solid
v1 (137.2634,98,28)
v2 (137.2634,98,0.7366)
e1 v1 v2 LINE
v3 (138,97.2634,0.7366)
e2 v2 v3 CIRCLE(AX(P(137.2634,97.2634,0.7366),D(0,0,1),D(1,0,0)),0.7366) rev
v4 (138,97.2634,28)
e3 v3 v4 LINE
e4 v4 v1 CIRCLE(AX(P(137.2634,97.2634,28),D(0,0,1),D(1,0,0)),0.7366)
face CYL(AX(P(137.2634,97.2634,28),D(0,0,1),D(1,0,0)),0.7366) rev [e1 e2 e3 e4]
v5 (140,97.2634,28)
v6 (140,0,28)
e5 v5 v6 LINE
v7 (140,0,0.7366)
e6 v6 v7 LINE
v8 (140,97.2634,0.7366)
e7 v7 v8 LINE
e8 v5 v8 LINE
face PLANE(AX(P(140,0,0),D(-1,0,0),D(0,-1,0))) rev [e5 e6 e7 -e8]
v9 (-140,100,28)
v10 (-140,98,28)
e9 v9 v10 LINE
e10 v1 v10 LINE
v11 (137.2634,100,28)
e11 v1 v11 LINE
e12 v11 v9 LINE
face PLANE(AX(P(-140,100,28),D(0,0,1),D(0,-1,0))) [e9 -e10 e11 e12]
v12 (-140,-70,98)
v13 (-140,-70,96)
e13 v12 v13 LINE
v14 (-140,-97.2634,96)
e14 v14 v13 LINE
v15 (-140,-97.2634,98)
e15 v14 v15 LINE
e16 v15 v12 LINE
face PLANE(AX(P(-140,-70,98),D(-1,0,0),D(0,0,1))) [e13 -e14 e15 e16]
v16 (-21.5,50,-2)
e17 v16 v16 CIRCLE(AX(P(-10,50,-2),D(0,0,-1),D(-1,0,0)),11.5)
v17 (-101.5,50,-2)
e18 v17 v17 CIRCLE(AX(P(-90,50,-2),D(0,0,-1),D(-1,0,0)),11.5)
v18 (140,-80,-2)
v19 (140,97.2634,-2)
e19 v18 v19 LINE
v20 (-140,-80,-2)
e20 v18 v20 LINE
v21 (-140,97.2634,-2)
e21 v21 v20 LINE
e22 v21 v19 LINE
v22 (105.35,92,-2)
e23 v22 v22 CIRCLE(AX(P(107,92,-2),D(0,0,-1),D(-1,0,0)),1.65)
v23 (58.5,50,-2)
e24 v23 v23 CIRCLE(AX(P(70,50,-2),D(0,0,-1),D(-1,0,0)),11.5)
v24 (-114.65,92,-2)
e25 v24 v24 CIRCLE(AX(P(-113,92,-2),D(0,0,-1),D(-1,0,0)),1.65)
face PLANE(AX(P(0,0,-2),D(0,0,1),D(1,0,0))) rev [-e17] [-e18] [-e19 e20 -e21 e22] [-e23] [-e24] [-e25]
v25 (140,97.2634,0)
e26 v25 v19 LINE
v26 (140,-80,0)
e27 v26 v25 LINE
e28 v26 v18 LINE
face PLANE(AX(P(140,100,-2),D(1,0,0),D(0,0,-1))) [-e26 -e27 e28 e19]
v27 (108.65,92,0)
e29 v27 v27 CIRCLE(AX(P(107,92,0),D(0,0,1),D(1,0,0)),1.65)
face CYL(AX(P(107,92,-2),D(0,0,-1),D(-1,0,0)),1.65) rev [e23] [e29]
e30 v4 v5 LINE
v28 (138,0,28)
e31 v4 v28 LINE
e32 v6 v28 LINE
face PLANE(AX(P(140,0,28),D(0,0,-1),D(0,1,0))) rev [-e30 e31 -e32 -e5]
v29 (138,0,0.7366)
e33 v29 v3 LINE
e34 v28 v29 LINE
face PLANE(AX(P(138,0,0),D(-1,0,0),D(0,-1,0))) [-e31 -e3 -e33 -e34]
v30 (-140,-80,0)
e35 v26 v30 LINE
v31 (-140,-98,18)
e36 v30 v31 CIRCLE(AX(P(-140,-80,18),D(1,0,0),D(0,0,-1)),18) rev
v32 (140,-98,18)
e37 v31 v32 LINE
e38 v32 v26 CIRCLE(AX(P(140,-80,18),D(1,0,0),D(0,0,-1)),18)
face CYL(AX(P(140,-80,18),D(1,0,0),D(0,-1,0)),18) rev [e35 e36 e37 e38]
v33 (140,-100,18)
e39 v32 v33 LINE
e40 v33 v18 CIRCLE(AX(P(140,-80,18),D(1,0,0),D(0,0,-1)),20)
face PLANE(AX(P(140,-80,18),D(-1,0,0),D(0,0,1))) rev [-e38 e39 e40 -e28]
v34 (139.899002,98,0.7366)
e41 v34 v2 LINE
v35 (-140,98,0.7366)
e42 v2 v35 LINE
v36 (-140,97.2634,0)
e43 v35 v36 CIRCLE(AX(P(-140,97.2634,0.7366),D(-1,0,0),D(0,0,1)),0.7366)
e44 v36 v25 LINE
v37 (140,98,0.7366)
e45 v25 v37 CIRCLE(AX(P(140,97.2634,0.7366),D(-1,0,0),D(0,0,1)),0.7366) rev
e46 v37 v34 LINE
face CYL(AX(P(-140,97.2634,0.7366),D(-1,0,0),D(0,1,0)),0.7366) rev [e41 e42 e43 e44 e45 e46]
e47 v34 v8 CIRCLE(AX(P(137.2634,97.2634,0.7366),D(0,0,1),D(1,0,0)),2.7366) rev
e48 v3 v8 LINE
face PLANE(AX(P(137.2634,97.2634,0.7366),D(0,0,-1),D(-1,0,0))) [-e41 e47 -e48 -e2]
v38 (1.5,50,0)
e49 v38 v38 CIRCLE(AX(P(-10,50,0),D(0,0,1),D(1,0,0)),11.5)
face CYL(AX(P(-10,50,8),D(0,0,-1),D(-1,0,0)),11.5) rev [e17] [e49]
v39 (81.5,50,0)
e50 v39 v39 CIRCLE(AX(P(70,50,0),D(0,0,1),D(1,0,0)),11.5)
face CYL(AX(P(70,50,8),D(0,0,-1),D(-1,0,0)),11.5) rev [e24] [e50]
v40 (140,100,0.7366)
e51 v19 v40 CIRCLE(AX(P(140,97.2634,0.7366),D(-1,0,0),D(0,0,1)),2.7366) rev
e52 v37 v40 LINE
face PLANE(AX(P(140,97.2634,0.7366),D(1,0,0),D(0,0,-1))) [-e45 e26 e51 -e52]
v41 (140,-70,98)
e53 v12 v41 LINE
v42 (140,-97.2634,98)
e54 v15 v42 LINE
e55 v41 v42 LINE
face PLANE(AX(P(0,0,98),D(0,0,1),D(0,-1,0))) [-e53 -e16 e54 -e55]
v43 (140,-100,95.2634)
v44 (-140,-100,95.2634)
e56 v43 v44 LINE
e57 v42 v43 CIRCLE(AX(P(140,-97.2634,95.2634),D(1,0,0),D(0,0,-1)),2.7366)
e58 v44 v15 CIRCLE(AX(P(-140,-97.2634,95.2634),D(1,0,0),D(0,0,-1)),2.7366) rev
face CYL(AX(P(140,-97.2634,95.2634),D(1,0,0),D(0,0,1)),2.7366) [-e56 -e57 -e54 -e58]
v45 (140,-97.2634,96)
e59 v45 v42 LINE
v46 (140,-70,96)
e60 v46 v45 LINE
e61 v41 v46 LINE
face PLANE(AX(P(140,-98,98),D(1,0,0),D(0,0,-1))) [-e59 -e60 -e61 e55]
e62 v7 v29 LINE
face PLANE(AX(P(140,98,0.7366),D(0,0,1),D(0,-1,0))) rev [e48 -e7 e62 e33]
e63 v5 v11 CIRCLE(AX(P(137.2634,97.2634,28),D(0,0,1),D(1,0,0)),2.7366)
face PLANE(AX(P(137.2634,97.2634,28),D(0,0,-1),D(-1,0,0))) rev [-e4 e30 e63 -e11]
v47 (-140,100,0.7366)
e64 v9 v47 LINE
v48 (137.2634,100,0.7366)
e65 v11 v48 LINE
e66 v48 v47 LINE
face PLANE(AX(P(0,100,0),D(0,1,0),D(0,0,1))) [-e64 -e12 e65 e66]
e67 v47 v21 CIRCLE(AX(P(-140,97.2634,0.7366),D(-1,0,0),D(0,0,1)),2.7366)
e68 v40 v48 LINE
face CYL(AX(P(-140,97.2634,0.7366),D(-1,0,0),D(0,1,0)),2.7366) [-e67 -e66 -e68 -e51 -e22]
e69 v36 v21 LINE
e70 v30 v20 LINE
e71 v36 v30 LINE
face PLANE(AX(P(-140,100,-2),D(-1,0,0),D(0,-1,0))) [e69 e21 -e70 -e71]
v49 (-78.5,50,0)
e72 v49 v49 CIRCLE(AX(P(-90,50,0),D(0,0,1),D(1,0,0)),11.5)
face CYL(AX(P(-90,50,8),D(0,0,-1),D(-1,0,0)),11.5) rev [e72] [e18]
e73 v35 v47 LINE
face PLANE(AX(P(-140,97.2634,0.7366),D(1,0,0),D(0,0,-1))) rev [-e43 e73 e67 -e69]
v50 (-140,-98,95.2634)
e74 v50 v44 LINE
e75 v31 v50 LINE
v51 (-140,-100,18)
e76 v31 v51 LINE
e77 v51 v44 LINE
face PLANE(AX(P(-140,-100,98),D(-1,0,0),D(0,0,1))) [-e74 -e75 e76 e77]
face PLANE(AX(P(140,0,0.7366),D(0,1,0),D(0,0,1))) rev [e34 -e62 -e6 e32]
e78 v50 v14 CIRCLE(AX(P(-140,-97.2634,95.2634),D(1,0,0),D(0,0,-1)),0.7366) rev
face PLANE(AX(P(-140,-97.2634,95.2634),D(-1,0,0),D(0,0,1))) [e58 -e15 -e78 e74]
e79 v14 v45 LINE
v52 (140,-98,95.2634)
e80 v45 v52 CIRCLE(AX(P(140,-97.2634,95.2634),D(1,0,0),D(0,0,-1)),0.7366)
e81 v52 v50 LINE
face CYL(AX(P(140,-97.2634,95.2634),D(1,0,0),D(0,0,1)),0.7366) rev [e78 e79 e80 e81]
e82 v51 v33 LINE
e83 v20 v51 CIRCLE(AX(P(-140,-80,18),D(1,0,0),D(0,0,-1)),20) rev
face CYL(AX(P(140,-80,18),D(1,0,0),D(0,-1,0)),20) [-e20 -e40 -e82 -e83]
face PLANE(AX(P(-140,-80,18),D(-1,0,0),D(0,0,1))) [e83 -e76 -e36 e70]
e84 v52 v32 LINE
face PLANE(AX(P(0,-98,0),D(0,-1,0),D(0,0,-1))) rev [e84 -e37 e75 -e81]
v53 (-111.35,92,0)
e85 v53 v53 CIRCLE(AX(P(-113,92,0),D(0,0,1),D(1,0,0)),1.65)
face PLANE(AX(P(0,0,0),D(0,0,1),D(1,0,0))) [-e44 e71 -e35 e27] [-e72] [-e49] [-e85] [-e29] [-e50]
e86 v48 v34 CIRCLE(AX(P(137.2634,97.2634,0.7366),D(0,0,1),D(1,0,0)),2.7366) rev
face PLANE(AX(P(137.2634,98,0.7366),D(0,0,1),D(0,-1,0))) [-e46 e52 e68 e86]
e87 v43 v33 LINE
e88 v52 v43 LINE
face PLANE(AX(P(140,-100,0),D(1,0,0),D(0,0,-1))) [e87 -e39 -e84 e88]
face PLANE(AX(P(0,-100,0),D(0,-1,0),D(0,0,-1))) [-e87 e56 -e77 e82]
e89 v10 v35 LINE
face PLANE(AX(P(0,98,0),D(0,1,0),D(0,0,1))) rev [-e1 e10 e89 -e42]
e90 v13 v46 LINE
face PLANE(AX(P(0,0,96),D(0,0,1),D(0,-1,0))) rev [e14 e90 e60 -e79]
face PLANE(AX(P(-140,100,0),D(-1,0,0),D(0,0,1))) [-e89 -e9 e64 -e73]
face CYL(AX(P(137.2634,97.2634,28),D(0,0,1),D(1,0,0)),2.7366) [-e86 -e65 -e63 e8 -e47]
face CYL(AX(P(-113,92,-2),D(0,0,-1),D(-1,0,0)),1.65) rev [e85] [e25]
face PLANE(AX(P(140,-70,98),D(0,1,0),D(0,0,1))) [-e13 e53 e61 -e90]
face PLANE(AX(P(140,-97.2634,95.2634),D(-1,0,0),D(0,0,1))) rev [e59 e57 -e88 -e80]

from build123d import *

# Parameters (mm, degrees)
SKETCH_2_W                       = 280
SKETCH_2_H                       = 200
SM_BASE_FLANGE_1_DEPTH           = 2
SM_EDGE_FLANGE_1_STRIP_W         = 44
SM_EDGE_FLANGE_1_STRIP_H         = 2
SM_EDGE_FLANGE_1_STRIP_CUT_DEPTH = 280
SM_EDGE_FLANGE_1_DEPTH           = 280
SM_EDGE_FLANGE_2_STRIP_W         = 9.4732
SM_EDGE_FLANGE_2_STRIP_H         = 2
SM_EDGE_FLANGE_2_STRIP_CUT_DEPTH = 280
SM_EDGE_FLANGE_2_DEPTH           = 280
SM_EDGE_FLANGE_3_STRIP_W         = 9.4732
SM_EDGE_FLANGE_3_STRIP_H         = 2
SM_EDGE_FLANGE_3_STRIP_CUT_DEPTH = 280
SM_EDGE_FLANGE_3_DEPTH           = 280
SKETCH_36_R                      = 11.5
CUT_EXTRUDE_3_DEPTH              = 10
SM_EDGE_FLANGE_4_STRIP_W         = 9.4732
SM_EDGE_FLANGE_4_STRIP_H         = 2
SM_EDGE_FLANGE_4_STRIP_CUT_DEPTH = 27.2634
SM_EDGE_FLANGE_4_DEPTH           = 27.2634
HOLE_WIZARD_M4_1_D               = 3.3


# Sheet-metal steps are written as plain solids
with BuildPart() as part:
    # Sketch 2 → 基体-法兰1 (new body)
    with BuildSketch(Plane.XY):
        Rectangle(SKETCH_2_W, SKETCH_2_H)
    extrude(amount=-SM_BASE_FLANGE_1_DEPTH)

    # 边线-法兰1 strip (across the edge) → 边线-法兰1 strip cut (cut)
    with BuildSketch(Plane(origin=(-140, -100, 0), x_dir=(0, 1, 0), z_dir=(1, 0, 0))):
        with Locations((-2, -1)):
            Rectangle(SM_EDGE_FLANGE_1_STRIP_W, SM_EDGE_FLANGE_1_STRIP_H)
    extrude(amount=SM_EDGE_FLANGE_1_STRIP_CUT_DEPTH, mode=Mode.SUBTRACT)

    # 边线-法兰1 section (across the edge) → 边线-法兰1 (add)
    with BuildSketch(Plane(origin=(-140, -100, 0), x_dir=(0, 1, 0), z_dir=(1, 0, 0))):
        with BuildLine():
            Line((0, 18), (0, 98))
            Line((0, 98), (2, 98))
            Line((2, 98), (2, 18))
            ThreePointArc((2, 18), (7.272077939, 5.272077939), (20, 0))
            Line((20, 0), (20, -2))
            ThreePointArc((20, -2), (5.857864376, 3.857864376), (0, 18))
        make_face()
    extrude(amount=SM_EDGE_FLANGE_1_DEPTH)

    # 边线-法兰2 strip (across the edge) → 边线-法兰2 strip cut (cut)
    with BuildSketch(Plane(origin=(140, 100, 0), x_dir=(0, -1, 0), z_dir=(-1, 0, 0))):
        with Locations((-2, -1)):
            Rectangle(SM_EDGE_FLANGE_2_STRIP_W, SM_EDGE_FLANGE_2_STRIP_H)
    extrude(amount=SM_EDGE_FLANGE_2_STRIP_CUT_DEPTH, mode=Mode.SUBTRACT)

    # 边线-法兰2 section (across the edge) → 边线-法兰2 (add)
    with BuildSketch(Plane(origin=(140, 100, 0), x_dir=(0, -1, 0), z_dir=(-1, 0, 0))):
        with BuildLine():
            Line((0, 0.7366), (0, 28))
            Line((0, 28), (2, 28))
            Line((2, 28), (2, 0.7366))
            ThreePointArc((2, 0.7366), (2.215745145, 0.215745145), (2.7366, 0))
            Line((2.7366, 0), (2.7366, -2))
            ThreePointArc((2.7366, -2), (0.801531583, -1.198468417), (0, 0.7366))
        make_face()
    extrude(amount=SM_EDGE_FLANGE_2_DEPTH)

    # 边线-法兰3 strip (across the edge) → 边线-法兰3 strip cut (cut)
    with BuildSketch(Plane(origin=(-140, -98, 98), x_dir=(0, 0, -1), z_dir=(1, 0, 0))):
        with Locations((-2, -1)):
            Rectangle(SM_EDGE_FLANGE_3_STRIP_W, SM_EDGE_FLANGE_3_STRIP_H)
    extrude(amount=SM_EDGE_FLANGE_3_STRIP_CUT_DEPTH, mode=Mode.SUBTRACT)

    # 边线-法兰3 section (across the edge) → 边线-法兰3 (add)
    with BuildSketch(Plane(origin=(-140, -98, 98), x_dir=(0, 0, -1), z_dir=(1, 0, 0))):
        with BuildLine():
            Line((0, 0.7366), (0, 28))
            Line((0, 28), (2, 28))
            Line((2, 28), (2, 0.7366))
            ThreePointArc((2, 0.7366), (2.215745145, 0.215745145), (2.7366, 0))
            Line((2.7366, 0), (2.7366, -2))
            ThreePointArc((2.7366, -2), (0.801531583, -1.198468417), (0, 0.7366))
        make_face()
    extrude(amount=SM_EDGE_FLANGE_3_DEPTH)

    # 草图36 → 切除-拉伸3 (cut)
    with BuildSketch(Plane(origin=(0, 0, -2), x_dir=(-1, 0, 0), z_dir=(0, 0, -1))):
        with Locations((-70, 50)):
            Circle(SKETCH_36_R)
        with Locations((10, 50)):
            Circle(SKETCH_36_R)
        with Locations((90, 50)):
            Circle(SKETCH_36_R)
    extrude(amount=-CUT_EXTRUDE_3_DEPTH, mode=Mode.SUBTRACT)

    # 边线-法兰4 strip (across the edge) → 边线-法兰4 strip cut (cut)
    with BuildSketch(Plane(origin=(140, 98, 0.7366), x_dir=(-1, 0, 0), z_dir=(0, 0, 1))):
        with Locations((-2, -1)):
            Rectangle(SM_EDGE_FLANGE_4_STRIP_W, SM_EDGE_FLANGE_4_STRIP_H)
    extrude(amount=SM_EDGE_FLANGE_4_STRIP_CUT_DEPTH, mode=Mode.SUBTRACT)

    # 边线-法兰4 section (across the edge) → 边线-法兰4 (add)
    with BuildSketch(Plane(origin=(140, 98, 0.7366), x_dir=(-1, 0, 0), z_dir=(0, 0, 1))):
        with BuildLine():
            Line((0, 0.7366), (0, 98))
            Line((0, 98), (2, 98))
            Line((2, 98), (2, 0.7366))
            ThreePointArc((2, 0.7366), (2.215745145, 0.215745145), (2.7366, 0))
            Line((2.7366, 0), (2.7366, -2))
            ThreePointArc((2.7366, -2), (0.801531583, -1.198468417), (0, 0.7366))
        make_face()
    extrude(amount=SM_EDGE_FLANGE_4_DEPTH)

    # M4 螺纹孔1 (through all)
    with Locations(Plane(origin=(0, 0, -2), x_dir=(-1, 0, 0), z_dir=(0, 0, -1))):
        with Locations((-107, 92), (113, 92)):
            Hole(HOLE_WIZARD_M4_1_D / 2)


solid = part.part
